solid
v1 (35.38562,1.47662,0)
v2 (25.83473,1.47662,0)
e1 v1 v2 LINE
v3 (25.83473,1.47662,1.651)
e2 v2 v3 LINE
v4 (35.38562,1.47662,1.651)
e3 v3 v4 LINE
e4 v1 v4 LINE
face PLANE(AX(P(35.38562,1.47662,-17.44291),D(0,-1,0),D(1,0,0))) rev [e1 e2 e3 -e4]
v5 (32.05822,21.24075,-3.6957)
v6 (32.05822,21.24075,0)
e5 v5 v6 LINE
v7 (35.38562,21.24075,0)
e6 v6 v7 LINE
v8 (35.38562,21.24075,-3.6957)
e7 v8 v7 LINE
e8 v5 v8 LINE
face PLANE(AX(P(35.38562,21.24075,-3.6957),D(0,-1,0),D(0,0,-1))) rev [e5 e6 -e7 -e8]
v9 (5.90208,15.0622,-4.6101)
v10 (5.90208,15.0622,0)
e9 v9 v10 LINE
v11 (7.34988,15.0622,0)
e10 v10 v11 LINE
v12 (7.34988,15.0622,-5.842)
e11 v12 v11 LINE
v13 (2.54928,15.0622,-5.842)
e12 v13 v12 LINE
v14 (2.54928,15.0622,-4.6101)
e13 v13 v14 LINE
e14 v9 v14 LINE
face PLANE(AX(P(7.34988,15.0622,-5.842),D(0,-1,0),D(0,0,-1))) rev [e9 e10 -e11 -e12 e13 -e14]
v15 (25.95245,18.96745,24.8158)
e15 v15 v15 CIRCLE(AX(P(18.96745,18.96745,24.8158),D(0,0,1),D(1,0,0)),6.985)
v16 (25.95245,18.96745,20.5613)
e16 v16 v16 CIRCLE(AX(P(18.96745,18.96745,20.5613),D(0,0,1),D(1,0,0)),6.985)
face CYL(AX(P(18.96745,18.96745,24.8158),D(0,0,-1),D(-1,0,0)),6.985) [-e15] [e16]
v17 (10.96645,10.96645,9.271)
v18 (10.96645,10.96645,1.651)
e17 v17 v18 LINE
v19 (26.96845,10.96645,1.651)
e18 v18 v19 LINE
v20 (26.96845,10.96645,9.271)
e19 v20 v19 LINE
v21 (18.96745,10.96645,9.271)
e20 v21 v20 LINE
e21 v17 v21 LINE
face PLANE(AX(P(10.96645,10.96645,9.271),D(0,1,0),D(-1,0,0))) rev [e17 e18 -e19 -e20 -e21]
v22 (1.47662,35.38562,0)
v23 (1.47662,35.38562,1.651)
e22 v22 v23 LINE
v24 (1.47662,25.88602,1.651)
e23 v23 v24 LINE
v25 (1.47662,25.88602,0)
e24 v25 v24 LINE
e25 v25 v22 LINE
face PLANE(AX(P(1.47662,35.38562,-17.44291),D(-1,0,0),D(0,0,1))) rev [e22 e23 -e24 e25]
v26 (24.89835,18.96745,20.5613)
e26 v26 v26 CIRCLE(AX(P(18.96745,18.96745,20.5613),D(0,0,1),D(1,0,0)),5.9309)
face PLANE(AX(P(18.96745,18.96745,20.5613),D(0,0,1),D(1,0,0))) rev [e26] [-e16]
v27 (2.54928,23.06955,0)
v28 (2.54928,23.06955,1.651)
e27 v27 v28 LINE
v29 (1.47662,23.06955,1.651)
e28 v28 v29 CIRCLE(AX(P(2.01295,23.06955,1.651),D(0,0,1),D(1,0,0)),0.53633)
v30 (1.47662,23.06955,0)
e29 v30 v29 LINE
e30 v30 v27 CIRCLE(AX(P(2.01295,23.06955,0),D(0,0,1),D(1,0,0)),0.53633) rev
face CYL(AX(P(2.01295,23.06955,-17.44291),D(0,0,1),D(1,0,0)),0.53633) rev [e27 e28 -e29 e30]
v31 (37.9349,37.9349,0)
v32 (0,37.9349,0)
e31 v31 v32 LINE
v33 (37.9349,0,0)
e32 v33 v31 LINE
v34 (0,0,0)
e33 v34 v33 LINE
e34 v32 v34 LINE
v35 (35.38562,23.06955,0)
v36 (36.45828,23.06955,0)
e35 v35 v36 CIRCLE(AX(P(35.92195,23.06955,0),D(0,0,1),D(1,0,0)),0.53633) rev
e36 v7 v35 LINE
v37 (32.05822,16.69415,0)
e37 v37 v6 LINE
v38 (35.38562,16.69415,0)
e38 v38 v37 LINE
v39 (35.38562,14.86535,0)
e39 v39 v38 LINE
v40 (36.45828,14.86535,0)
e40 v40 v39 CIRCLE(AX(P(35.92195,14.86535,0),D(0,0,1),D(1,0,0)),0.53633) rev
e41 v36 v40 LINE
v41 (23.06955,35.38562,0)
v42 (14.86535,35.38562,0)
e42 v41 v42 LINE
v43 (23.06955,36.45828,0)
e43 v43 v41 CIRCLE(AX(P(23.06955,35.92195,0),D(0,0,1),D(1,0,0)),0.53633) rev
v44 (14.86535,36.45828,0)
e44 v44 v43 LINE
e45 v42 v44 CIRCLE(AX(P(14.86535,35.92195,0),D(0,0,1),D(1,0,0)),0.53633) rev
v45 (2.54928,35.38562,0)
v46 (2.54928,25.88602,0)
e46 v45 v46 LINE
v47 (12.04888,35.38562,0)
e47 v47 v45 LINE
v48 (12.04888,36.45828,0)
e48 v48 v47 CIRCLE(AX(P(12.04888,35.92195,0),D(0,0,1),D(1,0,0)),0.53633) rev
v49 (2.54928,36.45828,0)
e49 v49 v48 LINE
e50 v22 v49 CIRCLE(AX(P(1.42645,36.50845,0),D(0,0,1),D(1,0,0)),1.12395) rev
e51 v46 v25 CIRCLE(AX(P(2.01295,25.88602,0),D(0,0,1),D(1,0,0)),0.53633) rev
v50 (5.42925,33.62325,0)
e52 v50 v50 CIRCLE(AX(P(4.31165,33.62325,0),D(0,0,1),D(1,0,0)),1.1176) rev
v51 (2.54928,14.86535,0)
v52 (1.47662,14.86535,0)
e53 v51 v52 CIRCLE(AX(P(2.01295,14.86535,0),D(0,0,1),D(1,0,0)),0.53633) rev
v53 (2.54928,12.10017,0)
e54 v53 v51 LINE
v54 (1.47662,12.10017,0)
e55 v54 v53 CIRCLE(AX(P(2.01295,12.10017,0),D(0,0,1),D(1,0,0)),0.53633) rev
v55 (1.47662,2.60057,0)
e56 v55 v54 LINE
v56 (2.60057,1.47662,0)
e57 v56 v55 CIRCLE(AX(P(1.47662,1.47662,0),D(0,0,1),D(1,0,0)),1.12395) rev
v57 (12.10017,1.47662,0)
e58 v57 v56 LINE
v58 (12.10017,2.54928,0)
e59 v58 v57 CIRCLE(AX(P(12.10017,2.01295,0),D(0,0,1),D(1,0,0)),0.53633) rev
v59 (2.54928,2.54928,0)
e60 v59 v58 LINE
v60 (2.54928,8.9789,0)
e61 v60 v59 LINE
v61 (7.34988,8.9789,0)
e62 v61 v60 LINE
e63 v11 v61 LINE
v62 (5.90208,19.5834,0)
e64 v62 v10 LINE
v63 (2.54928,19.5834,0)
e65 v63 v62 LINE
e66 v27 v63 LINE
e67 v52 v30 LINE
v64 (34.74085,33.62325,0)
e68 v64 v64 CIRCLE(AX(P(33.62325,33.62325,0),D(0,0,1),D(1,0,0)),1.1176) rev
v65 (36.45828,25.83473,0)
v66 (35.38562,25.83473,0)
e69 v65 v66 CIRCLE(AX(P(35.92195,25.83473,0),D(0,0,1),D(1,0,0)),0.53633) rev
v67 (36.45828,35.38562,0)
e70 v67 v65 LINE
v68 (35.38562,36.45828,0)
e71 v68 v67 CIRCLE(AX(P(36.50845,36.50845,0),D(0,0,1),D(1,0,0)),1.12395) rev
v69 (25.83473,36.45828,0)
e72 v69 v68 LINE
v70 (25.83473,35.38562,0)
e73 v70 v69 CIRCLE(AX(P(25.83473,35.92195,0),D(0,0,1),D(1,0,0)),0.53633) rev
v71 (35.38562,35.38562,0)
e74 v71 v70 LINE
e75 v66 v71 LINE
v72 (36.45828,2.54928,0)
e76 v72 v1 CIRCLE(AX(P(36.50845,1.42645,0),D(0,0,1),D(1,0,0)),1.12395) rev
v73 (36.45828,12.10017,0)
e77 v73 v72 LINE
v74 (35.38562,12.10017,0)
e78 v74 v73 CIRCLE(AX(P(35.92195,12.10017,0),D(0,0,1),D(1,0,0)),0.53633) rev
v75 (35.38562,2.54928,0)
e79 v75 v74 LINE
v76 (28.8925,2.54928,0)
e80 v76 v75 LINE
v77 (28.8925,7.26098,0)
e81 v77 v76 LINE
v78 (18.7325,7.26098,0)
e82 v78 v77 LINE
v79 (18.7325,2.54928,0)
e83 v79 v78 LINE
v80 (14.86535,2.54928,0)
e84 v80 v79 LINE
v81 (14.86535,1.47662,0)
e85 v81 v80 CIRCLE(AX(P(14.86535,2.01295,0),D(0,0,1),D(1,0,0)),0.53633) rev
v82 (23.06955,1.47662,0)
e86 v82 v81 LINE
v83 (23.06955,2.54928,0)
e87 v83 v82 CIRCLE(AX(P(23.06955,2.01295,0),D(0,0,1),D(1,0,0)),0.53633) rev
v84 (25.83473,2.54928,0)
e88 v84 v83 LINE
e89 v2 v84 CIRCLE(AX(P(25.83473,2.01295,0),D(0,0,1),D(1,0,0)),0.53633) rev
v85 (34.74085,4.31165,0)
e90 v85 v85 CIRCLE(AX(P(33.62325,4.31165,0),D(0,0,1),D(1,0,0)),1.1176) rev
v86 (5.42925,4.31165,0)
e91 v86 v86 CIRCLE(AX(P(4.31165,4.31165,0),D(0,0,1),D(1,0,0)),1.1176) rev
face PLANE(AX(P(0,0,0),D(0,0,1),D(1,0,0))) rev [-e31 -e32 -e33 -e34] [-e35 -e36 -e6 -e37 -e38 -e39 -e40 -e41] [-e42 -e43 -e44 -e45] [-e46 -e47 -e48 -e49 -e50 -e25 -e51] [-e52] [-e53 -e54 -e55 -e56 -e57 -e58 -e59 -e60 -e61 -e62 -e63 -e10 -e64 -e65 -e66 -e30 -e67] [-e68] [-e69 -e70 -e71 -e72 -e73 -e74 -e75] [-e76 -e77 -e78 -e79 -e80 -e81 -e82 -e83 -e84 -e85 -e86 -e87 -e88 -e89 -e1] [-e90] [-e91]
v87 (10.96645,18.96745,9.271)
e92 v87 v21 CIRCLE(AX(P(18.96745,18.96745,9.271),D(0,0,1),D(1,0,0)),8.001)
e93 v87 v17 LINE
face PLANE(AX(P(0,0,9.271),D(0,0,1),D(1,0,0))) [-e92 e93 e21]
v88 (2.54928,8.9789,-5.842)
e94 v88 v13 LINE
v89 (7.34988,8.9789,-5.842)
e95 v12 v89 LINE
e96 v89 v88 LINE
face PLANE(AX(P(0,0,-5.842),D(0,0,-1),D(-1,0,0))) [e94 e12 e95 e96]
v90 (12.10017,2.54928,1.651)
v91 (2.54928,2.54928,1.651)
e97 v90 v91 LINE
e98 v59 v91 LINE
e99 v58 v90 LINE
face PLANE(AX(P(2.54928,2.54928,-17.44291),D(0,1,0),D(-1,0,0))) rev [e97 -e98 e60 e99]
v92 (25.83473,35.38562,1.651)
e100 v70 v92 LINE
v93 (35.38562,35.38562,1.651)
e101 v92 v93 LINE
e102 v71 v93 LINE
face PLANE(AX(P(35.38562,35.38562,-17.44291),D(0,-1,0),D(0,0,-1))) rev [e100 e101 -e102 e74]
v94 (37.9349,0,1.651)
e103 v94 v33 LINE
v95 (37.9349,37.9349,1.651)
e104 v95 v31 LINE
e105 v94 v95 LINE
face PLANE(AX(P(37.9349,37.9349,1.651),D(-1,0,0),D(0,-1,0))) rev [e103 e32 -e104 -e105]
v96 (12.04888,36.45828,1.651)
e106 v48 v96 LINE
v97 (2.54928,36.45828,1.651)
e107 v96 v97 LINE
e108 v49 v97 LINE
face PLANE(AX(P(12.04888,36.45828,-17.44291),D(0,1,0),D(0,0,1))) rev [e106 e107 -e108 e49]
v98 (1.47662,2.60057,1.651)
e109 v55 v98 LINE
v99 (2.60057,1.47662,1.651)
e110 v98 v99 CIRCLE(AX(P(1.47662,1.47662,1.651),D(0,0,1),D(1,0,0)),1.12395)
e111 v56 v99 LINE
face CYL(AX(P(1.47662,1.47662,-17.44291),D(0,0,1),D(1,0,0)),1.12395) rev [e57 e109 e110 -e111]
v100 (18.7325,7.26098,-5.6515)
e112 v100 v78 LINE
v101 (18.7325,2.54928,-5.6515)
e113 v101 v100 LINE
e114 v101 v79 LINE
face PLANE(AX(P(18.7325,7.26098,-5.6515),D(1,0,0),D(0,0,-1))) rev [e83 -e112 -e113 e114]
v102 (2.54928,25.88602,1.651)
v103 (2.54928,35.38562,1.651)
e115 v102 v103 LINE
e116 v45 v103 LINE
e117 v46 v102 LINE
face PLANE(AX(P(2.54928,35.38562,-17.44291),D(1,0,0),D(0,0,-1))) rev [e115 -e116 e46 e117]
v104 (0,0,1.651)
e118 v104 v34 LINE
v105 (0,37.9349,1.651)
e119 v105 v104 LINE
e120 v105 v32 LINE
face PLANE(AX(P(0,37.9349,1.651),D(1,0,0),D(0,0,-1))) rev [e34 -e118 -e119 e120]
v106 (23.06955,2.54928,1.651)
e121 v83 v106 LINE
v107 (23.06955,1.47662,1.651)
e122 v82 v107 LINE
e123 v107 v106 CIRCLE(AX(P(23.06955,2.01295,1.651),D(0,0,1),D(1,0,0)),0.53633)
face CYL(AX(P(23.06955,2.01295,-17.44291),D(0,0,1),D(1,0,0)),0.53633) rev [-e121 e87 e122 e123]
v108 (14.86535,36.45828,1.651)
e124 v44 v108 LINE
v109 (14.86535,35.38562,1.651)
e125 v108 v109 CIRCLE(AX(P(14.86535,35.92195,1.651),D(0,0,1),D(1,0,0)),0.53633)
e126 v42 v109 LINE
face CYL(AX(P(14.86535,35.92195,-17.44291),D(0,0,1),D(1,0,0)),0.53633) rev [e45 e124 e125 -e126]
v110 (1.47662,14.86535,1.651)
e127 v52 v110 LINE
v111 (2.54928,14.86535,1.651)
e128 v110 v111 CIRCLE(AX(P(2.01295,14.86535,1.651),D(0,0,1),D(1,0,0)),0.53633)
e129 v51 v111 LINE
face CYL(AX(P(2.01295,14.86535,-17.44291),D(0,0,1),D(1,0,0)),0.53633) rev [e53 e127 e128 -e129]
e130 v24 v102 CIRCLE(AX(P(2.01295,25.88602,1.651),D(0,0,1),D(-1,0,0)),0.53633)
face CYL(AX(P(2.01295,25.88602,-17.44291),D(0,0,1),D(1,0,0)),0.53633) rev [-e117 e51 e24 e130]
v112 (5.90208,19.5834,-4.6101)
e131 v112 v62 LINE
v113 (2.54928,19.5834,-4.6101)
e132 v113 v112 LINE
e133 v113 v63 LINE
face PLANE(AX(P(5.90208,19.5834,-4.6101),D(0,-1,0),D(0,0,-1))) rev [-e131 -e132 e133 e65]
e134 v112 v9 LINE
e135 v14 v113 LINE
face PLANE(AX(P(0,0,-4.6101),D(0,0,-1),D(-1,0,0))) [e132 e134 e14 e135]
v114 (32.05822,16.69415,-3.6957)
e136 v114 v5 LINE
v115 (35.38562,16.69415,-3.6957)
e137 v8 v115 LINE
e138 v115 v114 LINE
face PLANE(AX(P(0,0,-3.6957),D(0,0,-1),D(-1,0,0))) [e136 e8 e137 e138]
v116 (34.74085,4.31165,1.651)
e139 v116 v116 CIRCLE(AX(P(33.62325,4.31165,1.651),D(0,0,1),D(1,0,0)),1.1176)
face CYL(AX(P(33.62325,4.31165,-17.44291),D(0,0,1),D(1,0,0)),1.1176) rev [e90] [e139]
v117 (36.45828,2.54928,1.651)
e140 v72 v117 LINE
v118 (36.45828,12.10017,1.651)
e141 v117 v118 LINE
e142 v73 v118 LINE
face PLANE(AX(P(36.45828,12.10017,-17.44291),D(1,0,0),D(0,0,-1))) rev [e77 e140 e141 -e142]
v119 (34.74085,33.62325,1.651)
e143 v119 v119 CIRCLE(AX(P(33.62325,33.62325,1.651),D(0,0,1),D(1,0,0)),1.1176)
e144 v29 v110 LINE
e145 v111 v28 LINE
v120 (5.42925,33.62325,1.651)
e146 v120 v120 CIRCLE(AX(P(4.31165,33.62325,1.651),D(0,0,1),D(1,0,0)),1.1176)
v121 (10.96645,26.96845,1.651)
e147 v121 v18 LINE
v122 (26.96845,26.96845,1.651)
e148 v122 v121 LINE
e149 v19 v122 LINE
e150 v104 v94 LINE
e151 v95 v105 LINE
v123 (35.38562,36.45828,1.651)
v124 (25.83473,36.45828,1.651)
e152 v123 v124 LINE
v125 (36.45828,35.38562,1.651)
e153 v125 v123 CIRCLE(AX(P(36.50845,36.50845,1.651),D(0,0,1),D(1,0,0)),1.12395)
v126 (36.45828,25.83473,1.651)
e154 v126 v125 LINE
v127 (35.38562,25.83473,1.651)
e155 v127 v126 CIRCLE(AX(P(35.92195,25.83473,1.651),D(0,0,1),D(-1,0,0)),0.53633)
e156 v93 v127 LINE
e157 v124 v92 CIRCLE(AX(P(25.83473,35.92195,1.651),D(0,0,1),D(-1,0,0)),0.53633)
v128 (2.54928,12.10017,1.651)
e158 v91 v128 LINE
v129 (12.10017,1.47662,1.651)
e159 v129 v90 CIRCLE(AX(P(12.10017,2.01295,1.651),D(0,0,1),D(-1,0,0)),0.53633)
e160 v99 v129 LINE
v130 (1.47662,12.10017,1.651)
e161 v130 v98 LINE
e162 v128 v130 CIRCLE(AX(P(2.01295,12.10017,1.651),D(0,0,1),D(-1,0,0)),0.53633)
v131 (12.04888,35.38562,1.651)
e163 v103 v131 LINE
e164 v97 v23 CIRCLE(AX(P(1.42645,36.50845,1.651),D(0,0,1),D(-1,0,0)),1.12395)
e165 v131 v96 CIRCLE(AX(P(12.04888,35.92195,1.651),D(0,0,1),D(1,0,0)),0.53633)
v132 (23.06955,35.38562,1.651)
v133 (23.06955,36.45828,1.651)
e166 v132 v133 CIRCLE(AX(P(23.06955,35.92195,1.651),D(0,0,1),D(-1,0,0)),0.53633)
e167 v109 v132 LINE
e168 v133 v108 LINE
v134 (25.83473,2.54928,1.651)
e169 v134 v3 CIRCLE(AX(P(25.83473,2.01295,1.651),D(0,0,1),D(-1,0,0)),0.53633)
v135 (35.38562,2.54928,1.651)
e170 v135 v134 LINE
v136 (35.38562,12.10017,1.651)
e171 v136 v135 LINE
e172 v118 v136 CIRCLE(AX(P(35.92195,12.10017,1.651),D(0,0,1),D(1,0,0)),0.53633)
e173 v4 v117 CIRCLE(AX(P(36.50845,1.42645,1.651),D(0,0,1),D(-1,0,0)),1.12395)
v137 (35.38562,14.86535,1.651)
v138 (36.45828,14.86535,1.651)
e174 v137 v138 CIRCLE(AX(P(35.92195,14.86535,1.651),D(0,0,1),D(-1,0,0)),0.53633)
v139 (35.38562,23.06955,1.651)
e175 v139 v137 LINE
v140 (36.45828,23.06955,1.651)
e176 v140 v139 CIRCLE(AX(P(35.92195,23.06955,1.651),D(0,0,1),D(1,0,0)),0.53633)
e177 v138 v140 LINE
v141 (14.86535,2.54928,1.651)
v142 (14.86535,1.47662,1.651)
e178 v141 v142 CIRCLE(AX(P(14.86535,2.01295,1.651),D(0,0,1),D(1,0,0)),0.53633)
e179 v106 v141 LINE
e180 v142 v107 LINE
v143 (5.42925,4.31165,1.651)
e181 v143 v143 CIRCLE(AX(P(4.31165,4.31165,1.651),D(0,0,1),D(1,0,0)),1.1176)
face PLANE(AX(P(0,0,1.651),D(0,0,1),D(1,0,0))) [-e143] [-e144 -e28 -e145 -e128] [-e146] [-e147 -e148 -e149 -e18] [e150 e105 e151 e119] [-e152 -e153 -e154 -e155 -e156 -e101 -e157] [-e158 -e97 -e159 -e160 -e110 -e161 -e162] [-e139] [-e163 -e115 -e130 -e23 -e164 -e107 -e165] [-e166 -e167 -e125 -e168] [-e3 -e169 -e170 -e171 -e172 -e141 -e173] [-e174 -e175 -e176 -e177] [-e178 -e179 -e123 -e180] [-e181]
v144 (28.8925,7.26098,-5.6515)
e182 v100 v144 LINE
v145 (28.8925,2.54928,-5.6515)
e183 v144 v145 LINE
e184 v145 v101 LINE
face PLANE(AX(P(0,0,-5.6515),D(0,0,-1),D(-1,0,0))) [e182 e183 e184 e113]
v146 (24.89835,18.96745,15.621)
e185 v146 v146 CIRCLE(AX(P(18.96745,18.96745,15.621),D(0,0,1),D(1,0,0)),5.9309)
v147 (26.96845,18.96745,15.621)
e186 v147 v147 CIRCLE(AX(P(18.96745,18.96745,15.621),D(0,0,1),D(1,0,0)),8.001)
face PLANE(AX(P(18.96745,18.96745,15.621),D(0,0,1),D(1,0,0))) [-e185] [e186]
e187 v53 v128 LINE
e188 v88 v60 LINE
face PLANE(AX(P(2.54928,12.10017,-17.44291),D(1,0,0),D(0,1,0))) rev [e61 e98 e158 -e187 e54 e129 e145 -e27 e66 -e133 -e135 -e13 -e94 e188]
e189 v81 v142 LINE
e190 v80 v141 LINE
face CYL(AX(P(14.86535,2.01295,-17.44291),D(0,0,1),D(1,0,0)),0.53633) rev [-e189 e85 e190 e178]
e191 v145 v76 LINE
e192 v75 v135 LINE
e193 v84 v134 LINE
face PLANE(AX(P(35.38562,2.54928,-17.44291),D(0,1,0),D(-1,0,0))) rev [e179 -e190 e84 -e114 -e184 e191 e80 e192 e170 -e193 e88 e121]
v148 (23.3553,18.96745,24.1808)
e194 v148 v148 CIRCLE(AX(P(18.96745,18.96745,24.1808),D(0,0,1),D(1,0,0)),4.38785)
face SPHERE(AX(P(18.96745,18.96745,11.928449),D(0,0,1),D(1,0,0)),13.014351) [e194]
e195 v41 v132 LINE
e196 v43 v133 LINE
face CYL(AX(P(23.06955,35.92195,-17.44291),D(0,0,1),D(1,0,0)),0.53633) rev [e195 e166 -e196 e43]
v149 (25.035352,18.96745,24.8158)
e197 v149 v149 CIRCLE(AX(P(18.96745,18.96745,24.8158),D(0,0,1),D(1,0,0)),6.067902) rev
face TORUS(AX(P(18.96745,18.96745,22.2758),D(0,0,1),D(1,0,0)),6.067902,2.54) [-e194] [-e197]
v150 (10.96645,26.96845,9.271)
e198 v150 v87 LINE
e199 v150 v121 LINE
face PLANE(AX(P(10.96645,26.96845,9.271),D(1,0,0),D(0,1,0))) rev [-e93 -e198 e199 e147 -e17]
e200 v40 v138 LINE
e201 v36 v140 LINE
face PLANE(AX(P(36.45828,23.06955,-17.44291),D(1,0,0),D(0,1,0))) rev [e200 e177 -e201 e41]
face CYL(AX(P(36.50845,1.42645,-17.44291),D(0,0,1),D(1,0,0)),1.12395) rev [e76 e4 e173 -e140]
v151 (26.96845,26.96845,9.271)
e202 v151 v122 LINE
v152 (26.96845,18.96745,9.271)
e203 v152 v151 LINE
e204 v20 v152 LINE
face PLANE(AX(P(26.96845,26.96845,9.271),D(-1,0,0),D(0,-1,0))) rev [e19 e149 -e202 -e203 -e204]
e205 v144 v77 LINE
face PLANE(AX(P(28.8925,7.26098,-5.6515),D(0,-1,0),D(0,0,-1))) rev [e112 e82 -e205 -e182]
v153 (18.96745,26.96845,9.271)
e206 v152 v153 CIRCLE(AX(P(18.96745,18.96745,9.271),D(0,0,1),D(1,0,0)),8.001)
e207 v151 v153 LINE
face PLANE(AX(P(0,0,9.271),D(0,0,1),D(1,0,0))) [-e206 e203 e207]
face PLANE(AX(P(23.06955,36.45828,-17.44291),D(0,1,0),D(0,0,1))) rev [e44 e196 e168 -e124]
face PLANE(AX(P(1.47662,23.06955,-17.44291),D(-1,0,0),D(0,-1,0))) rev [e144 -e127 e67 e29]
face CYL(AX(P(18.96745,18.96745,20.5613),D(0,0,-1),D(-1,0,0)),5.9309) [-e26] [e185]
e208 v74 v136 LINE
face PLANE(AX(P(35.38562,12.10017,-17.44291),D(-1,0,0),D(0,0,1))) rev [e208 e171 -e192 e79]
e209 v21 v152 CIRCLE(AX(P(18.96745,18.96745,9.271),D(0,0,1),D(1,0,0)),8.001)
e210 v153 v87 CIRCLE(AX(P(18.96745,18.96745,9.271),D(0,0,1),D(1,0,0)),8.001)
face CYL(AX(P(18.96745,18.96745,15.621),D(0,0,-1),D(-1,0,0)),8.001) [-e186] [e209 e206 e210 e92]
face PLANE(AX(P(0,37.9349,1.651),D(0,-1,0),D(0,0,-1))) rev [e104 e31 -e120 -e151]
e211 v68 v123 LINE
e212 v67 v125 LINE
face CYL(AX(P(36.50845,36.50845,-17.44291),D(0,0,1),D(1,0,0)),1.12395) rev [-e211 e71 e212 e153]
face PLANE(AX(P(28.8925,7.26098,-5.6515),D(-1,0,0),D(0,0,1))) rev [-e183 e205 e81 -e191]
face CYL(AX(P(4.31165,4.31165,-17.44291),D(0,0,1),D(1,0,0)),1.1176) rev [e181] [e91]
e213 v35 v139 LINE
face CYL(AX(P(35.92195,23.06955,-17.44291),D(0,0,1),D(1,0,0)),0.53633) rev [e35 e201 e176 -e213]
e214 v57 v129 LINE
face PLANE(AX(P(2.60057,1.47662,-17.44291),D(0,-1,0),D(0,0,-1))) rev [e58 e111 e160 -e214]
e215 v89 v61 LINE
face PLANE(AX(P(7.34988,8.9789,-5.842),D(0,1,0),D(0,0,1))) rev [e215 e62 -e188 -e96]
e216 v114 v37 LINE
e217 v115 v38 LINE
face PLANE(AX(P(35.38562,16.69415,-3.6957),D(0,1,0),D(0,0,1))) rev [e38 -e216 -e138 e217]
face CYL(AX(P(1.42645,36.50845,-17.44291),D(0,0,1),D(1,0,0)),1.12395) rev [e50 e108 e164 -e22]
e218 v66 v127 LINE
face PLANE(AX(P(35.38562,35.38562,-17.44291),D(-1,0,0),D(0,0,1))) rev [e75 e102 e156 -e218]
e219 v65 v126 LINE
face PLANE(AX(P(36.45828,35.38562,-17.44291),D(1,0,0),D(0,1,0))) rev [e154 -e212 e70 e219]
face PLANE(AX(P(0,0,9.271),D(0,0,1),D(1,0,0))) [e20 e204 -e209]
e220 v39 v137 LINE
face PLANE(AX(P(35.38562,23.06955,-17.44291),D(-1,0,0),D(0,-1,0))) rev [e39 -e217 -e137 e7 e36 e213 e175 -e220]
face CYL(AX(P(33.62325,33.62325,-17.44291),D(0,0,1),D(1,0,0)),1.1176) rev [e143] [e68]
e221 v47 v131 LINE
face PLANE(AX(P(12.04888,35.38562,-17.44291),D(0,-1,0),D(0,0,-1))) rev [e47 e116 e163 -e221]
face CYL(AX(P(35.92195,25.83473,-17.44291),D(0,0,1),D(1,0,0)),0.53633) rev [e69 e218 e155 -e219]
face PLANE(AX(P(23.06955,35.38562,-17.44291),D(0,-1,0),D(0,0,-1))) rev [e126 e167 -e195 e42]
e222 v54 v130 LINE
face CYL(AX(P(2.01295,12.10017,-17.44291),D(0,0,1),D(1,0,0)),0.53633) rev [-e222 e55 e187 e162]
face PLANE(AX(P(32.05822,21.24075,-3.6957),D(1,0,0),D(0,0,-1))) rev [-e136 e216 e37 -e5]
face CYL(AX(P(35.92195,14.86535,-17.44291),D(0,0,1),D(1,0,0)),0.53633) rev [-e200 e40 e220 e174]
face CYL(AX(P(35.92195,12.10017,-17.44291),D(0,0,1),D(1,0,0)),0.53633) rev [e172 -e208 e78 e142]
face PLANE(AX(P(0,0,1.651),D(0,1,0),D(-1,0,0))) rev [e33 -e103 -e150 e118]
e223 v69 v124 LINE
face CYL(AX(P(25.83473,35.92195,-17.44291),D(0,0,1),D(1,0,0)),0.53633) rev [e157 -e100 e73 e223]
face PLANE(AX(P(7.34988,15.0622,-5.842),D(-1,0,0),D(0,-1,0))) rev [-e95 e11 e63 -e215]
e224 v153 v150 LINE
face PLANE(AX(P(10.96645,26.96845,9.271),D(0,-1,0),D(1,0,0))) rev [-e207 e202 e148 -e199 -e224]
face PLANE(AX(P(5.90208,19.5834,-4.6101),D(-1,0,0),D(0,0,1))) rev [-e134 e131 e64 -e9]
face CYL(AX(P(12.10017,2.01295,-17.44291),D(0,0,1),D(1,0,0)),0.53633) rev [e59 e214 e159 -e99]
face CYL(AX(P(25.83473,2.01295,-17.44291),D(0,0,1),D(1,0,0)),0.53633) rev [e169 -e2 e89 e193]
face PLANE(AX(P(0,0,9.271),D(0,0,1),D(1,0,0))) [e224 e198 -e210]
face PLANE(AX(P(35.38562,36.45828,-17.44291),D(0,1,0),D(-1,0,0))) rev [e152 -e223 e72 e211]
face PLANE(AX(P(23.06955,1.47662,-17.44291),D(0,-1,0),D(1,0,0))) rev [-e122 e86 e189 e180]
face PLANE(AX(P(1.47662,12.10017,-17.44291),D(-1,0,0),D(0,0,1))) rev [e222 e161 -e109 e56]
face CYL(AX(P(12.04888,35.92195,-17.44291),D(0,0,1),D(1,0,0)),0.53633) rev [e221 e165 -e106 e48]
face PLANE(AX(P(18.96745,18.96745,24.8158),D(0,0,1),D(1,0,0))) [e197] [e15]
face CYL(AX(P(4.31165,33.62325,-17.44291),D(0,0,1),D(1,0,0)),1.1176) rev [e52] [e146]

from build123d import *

# Parameters (mm, degrees)
SKETCH1_W           = 37.9349
SKETCH1_H           = 37.9349
BOSS_EXTRUDE1_DEPTH = 1.651
SKETCH2_W           = 16.002
SKETCH2_H           = 16.002
BOSS_EXTRUDE2_DEPTH = 7.62
SKETCH3_R           = 8.001
BOSS_EXTRUDE3_DEPTH = 6.35
SKETCH4_R           = 5.9309
BOSS_EXTRUDE4_DEPTH = 4.9403
SKETCH5_R           = 6.985
BOSS_EXTRUDE5_DEPTH = 4.2545
SKETCH6_R           = 4.38785
CUT_EXTRUDE1_DEPTH  = 0.635
FILLET2_R           = 2.54
SKETCH9_R           = 1.1176
CUT_EXTRUDE2_DEPTH  = 1.651
SKETCH12_W          = 3.3274
SKETCH12_H          = 4.5466
BOSS_EXTRUDE6_DEPTH = 3.6957
SKETCH13_W          = 10.16
SKETCH13_H          = 4.7117
BOSS_EXTRUDE7_DEPTH = 5.6515
SKETCH14_W          = 4.8006
SKETCH14_H          = 6.0833
BOSS_EXTRUDE8_DEPTH = 5.842
SKETCH15_W          = 3.3528
SKETCH15_H          = 4.5212
BOSS_EXTRUDE9_DEPTH = 4.6101


# Read off the part's stored shape, not the designer's step: Dome1
with BuildPart() as part:
    # Sketch1 → Boss-Extrude1 (new body)
    with BuildSketch(Plane.XY):
        with Locations((18.96745, 18.96745)):
            Rectangle(SKETCH1_W, SKETCH1_H)
    extrude(amount=BOSS_EXTRUDE1_DEPTH)

    # Sketch2 → Boss-Extrude2 (add)
    with BuildSketch(Plane.XY.offset(1.651)):
        with Locations((18.96745, 18.96745)):
            Rectangle(SKETCH2_W, SKETCH2_H)
    extrude(amount=BOSS_EXTRUDE2_DEPTH)

    # Sketch3 → Boss-Extrude3 (add)
    with BuildSketch(Plane.XY.offset(9.271)):
        with Locations((18.96745, 18.96745)):
            Circle(SKETCH3_R)
    extrude(amount=BOSS_EXTRUDE3_DEPTH)

    # Sketch4 → Boss-Extrude4 (add)
    with BuildSketch(Plane.XY.offset(15.621)):
        with Locations((18.96745, 18.96745)):
            Circle(SKETCH4_R)
    extrude(amount=BOSS_EXTRUDE4_DEPTH)

    # Sketch5 → Boss-Extrude5 (add)
    with BuildSketch(Plane.XY.offset(20.5613)):
        with Locations((18.96745, 18.96745)):
            Circle(SKETCH5_R)
    extrude(amount=BOSS_EXTRUDE5_DEPTH)

    # Sketch6 → Cut-Extrude1 (cut)
    with BuildSketch(Plane.XY.offset(24.8158)):
        with Locations((18.96745, 18.96745)):
            Circle(SKETCH6_R)
    extrude(amount=-CUT_EXTRUDE1_DEPTH, mode=Mode.SUBTRACT)

    # Fillet2
    # the kernel refuses this fillet: 2.54 mm, written as the material it takes off along each edge
    with BuildSketch(Plane(origin=(18.96745, 18.96745, 24.8158), x_dir=(1, 0, 0), z_dir=(0, -1, 0))) as fillet2_piece_1:
        with BuildLine():
            CenterArc((6.067902083, -2.54), FILLET2_R, 90, 41.409622109)
            Line((4.38785, -0.635), (4.354248958, -0.5969))
            ThreePointArc((4.354248958, -0.5969), (4.33705, -0.3175), (4.33705, 0))
            Line((4.33705, 0), (4.38785, 0.0508))
            Line((4.38785, 0.0508), (6.067902083, 0.0508))
            Line((6.067902083, 0.0508), (6.067902083, 0))
        make_face()
    revolve(axis=Axis((18.96745, 18.96745, 24.8158), (0, 0, 1)), mode=Mode.SUBTRACT)

    # Dome1 outline → Dome1 (revolve)
    with BuildSketch(Plane(origin=(18.96745, 18.96745, 0), x_dir=(1, 0, 0), z_dir=(0, -1, 0))):
        with BuildLine():
            Line((0, 24.1808), (4.387850012, 24.180799996))
            ThreePointArc((4.387850012, 24.180799996), (2.22676176, 24.75088497), (0, 24.9428))
            Line((0, 24.9428), (0, 24.1808))
        make_face()
    revolve(axis=Axis((18.96745, 18.96745, 0), (0, 0, 1)))

    # Sketch9 → Cut-Extrude2 (cut)
    with BuildSketch(Plane.XY.offset(1.651)):
        with Locations((33.62325, 33.62325)):
            Circle(SKETCH9_R)
        with Locations((4.31165, 33.62325)):
            Circle(SKETCH9_R)
        with Locations((4.31165, 4.31165)):
            Circle(SKETCH9_R)
        with Locations((33.62325, 4.31165)):
            Circle(SKETCH9_R)
        with BuildLine():
            Line((35.385619933, 12.100169933), (35.385619933, 2.549280067))
            Line((35.385619933, 2.549280067), (25.834730067, 2.549280067))
            ThreePointArc((25.834730067, 2.549280067), (25.2984, 2.01295), (25.834730067, 1.476619933))
            Line((25.834730067, 1.476619933), (35.385619933, 1.476619933))
            ThreePointArc((35.385619933, 1.476619933), (37.303202335, 0.631697665), (36.458280067, 2.549280067))
            Line((36.458280067, 2.549280067), (36.458280067, 12.100169933))
            ThreePointArc((36.458280067, 12.100169933), (35.92195, 12.6365), (35.385619933, 12.100169933))
        make_face()
        with BuildLine():
            Line((35.385619933, 36.458280067), (25.834730067, 36.458280067))
            ThreePointArc((25.834730067, 36.458280067), (25.2984, 35.92195), (25.834730067, 35.385619933))
            Line((25.834730067, 35.385619933), (35.385619933, 35.385619933))
            Line((35.385619933, 35.385619933), (35.385619933, 25.834730067))
            ThreePointArc((35.385619933, 25.834730067), (35.92195, 25.2984), (36.458280067, 25.834730067))
            Line((36.458280067, 25.834730067), (36.458280067, 35.385619933))
            ThreePointArc((36.458280067, 35.385619933), (37.303202335, 37.303202335), (35.385619933, 36.458280067))
        make_face()
        with BuildLine():
            Line((12.048880067, 36.458280067), (2.549280067, 36.458280067))
            ThreePointArc((2.549280067, 36.458280067), (0.631697665, 37.303202335), (1.476619933, 35.385619933))
            Line((1.476619933, 35.385619933), (1.476619933, 25.886019933))
            ThreePointArc((1.476619933, 25.886019933), (2.01295, 25.349689867), (2.549280067, 25.886019933))
            Line((2.549280067, 25.886019933), (2.549280067, 35.385619933))
            Line((2.549280067, 35.385619933), (12.048880067, 35.385619933))
            ThreePointArc((12.048880067, 35.385619933), (12.585210133, 35.92195), (12.048880067, 36.458280067))
        make_face()
        with BuildLine():
            Line((23.06955, 36.458280067), (14.86535, 36.458280067))
            ThreePointArc((14.86535, 36.458280067), (14.329019933, 35.92195), (14.86535, 35.385619933))
            Line((14.86535, 35.385619933), (23.06955, 35.385619933))
            ThreePointArc((23.06955, 35.385619933), (23.605880067, 35.92195), (23.06955, 36.458280067))
        make_face()
        with BuildLine():
            Line((2.549280067, 23.06955), (2.549280067, 14.86535))
            ThreePointArc((2.549280067, 14.86535), (2.01295, 14.329019933), (1.476619933, 14.86535))
            Line((1.476619933, 14.86535), (1.476619933, 23.06955))
            ThreePointArc((1.476619933, 23.06955), (2.01295, 23.605880067), (2.549280067, 23.06955))
        make_face()
        with BuildLine():
            Line((36.458280067, 23.06955), (36.458280067, 14.86535))
            ThreePointArc((36.458280067, 14.86535), (35.92195, 14.329019933), (35.385619933, 14.86535))
            Line((35.385619933, 14.86535), (35.385619933, 23.06955))
            ThreePointArc((35.385619933, 23.06955), (35.92195, 23.605880067), (36.458280067, 23.06955))
        make_face()
        with BuildLine():
            Line((23.06955, 2.549280067), (14.86535, 2.549280067))
            ThreePointArc((14.86535, 2.549280067), (14.329019933, 2.01295), (14.86535, 1.476619933))
            Line((14.86535, 1.476619933), (23.06955, 1.476619933))
            ThreePointArc((23.06955, 1.476619933), (23.605880067, 2.01295), (23.06955, 2.549280067))
        make_face()
        with BuildLine():
            Line((2.549280067, 12.100169933), (2.549280067, 2.549280067))
            Line((2.549280067, 2.549280067), (12.100169933, 2.549280067))
            ThreePointArc((12.100169933, 2.549280067), (12.6365, 2.01295), (12.100169933, 1.476619933))
            Line((12.100169933, 1.476619933), (2.600569933, 1.476619933))
            ThreePointArc((2.600569933, 1.476619933), (0.681867267, 0.681867267), (1.476619933, 2.600569933))
            Line((1.476619933, 2.600569933), (1.476619933, 12.100169933))
            ThreePointArc((1.476619933, 12.100169933), (2.01295, 12.6365), (2.549280067, 12.100169933))
        make_face()
    extrude(amount=-CUT_EXTRUDE2_DEPTH, mode=Mode.SUBTRACT)

    # Sketch12 → Boss-Extrude6 (add)
    with BuildSketch(Plane(origin=(0, 0, 0), x_dir=(-1, 0, 0), z_dir=(0, 0, -1))):
        with Locations((-33.721919933, 18.96745)):
            Rectangle(SKETCH12_W, SKETCH12_H)
    extrude(amount=BOSS_EXTRUDE6_DEPTH)

    # Sketch13 → Boss-Extrude7 (add)
    with BuildSketch(Plane(origin=(0, 0, 0), x_dir=(-1, 0, 0), z_dir=(0, 0, -1))):
        with Locations((-23.8125, 4.905130067)):
            Rectangle(SKETCH13_W, SKETCH13_H)
    extrude(amount=BOSS_EXTRUDE7_DEPTH)

    # Sketch14 → Boss-Extrude8 (add)
    with BuildSketch(Plane(origin=(0, 0, 0), x_dir=(-1, 0, 0), z_dir=(0, 0, -1))):
        with Locations((-4.949580067, 12.02055)):
            Rectangle(SKETCH14_W, SKETCH14_H)
    extrude(amount=BOSS_EXTRUDE8_DEPTH)

    # Sketch15 → Boss-Extrude9 (add)
    with BuildSketch(Plane(origin=(0, 0, 0), x_dir=(-1, 0, 0), z_dir=(0, 0, -1))):
        with Locations((-4.225680067, 17.3228)):
            Rectangle(SKETCH15_W, SKETCH15_H)
    extrude(amount=BOSS_EXTRUDE9_DEPTH)


solid = part.part
